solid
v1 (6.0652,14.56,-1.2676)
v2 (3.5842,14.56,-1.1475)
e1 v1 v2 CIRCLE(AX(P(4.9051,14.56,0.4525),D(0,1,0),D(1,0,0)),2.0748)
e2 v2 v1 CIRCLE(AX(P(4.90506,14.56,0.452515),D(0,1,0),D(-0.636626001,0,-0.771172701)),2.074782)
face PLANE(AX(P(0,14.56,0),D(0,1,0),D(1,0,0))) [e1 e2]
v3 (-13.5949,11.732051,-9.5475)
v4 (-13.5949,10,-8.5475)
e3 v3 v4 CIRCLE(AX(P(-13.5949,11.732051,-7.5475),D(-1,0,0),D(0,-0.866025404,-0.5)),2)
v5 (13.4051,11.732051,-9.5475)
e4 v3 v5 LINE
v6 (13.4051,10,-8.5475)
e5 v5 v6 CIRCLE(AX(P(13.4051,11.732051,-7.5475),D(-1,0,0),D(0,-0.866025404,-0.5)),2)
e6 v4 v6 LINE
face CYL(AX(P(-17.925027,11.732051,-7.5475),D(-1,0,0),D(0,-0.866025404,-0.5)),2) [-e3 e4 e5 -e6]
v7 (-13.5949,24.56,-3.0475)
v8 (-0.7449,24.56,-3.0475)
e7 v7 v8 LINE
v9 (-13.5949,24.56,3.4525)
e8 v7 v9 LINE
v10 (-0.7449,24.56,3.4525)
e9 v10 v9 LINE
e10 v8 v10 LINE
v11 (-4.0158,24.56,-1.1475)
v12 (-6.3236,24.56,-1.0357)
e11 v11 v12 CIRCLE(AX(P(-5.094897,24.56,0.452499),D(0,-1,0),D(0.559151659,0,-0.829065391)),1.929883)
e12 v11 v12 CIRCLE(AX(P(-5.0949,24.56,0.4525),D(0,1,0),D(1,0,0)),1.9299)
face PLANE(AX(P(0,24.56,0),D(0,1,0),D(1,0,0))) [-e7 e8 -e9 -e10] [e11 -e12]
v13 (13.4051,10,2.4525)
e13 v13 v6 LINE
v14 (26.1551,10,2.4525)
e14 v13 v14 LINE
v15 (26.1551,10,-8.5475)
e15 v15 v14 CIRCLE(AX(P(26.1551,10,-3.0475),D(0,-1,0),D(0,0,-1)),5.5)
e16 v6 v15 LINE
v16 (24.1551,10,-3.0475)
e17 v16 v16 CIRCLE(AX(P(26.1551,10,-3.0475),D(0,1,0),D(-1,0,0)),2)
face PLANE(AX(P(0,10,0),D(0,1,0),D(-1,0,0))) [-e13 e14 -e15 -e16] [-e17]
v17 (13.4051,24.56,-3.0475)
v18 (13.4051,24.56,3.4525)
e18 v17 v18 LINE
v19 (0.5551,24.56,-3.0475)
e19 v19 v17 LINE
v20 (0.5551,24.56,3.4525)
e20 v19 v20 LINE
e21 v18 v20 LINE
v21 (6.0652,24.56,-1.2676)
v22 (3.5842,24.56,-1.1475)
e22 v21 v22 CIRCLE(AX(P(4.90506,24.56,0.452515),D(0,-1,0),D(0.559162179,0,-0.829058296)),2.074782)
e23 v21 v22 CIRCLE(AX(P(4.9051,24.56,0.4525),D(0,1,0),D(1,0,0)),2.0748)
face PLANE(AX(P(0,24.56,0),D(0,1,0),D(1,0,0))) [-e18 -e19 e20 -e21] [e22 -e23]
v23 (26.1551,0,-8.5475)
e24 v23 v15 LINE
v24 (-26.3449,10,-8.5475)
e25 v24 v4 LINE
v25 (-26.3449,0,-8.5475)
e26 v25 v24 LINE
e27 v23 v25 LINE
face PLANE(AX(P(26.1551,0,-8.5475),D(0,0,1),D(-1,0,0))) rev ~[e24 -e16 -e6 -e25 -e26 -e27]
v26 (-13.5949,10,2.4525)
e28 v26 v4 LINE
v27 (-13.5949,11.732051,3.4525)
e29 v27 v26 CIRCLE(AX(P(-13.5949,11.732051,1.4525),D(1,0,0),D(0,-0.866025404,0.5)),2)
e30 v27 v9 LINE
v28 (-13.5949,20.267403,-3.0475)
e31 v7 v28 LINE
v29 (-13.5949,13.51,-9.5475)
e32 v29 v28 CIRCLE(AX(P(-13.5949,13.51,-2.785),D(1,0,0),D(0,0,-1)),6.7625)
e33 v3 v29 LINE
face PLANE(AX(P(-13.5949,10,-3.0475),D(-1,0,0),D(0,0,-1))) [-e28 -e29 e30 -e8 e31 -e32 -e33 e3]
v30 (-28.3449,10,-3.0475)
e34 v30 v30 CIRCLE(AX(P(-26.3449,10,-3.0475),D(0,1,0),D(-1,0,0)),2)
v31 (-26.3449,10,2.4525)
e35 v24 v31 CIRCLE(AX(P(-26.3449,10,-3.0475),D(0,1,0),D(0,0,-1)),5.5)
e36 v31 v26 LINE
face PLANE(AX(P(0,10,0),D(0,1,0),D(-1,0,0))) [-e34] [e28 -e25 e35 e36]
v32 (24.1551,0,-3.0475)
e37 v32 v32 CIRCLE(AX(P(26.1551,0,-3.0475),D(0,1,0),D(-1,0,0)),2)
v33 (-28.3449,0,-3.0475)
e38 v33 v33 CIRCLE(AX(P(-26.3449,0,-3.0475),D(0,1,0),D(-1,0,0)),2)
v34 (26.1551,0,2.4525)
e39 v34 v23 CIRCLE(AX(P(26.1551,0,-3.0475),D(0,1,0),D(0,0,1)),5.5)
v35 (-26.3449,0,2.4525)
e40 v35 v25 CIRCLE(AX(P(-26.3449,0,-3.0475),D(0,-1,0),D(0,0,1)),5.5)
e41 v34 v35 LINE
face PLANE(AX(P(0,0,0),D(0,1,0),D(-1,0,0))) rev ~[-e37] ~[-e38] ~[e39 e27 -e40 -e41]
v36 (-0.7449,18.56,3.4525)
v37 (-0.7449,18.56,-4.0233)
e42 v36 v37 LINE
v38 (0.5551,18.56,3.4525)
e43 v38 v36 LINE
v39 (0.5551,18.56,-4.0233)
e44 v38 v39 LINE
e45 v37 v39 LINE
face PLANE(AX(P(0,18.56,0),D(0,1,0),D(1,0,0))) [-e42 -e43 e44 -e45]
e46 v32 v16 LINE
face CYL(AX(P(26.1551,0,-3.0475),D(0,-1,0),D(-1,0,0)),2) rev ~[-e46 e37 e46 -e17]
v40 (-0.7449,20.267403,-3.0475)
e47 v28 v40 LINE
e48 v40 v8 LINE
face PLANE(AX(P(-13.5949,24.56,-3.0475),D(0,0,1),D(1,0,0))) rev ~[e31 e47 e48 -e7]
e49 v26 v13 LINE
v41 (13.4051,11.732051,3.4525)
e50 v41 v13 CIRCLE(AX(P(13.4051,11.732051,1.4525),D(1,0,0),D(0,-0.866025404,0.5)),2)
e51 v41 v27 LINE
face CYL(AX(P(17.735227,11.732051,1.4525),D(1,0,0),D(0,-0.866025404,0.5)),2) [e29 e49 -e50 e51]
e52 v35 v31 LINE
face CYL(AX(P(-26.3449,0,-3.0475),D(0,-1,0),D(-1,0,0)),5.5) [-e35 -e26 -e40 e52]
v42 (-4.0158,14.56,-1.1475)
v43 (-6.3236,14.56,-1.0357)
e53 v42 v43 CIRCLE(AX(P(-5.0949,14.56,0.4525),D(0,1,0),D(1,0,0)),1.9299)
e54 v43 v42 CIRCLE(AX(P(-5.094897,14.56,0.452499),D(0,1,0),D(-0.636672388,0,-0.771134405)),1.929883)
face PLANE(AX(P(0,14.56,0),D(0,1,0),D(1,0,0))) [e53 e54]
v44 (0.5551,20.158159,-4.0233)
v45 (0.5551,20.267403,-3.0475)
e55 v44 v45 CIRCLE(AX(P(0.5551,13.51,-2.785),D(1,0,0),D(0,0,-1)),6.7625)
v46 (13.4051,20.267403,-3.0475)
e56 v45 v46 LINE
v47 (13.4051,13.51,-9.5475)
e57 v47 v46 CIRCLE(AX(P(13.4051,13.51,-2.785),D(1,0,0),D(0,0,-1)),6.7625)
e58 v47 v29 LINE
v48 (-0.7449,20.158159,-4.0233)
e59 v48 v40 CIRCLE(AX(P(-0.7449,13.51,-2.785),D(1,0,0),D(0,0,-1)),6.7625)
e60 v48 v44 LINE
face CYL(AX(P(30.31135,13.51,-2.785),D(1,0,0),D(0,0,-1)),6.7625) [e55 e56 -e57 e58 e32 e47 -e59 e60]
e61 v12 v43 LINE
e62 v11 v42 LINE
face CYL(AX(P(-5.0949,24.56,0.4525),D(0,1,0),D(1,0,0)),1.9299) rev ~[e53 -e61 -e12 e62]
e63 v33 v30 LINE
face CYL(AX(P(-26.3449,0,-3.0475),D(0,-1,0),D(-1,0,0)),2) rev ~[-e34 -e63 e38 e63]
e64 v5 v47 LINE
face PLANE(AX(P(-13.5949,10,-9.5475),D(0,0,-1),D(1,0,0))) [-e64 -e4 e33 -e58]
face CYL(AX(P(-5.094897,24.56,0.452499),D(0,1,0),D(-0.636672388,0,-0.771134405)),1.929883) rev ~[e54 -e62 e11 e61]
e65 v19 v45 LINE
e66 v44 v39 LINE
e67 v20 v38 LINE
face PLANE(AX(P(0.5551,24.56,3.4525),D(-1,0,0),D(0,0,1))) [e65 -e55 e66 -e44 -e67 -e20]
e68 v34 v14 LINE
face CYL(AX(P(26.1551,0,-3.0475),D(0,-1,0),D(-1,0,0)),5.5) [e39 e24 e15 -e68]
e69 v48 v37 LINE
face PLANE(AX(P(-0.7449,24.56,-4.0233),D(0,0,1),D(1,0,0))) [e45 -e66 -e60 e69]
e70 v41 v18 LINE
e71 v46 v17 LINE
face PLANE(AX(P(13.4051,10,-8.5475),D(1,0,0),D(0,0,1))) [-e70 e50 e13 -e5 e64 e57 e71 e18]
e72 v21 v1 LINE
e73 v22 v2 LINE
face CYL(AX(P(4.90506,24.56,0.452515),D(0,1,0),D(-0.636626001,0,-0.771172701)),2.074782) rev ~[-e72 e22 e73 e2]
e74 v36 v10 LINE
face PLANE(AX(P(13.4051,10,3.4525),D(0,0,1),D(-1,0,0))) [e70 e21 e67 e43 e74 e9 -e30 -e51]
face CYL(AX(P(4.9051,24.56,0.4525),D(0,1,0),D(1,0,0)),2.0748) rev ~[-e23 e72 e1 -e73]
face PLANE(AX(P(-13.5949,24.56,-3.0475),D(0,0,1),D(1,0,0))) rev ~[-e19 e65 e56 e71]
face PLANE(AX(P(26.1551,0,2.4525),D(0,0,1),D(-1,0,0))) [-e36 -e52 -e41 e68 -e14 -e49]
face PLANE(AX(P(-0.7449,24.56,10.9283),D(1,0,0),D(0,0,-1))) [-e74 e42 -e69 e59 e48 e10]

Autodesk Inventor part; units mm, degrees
ref_plane "YZ Plane" through (0, 0, 0) normal (1, 0, 0) x (0, 1, 0)
ref_plane "XZ Plane" through (0, 0, 0) normal (0, 1, 0) x (-1, 0, 0)
ref_plane "XY Plane" through (0, 0, 0) normal (0, 0, 1) x (1, 0, 0)
sketch "Sketch1" plane through (0, 0, 0) normal (0, 1, 0) x (-1, 0, 0)
  circle A0 centre (-26.1551, -3.0475) radius 2
  arc A1 (-34.9051, -0.0475) -> (-17.4051, -0.0475) centre (-26.1551, -0.0475) ccw
  arc A2 (17.5949, -0.0475) -> (35.0949, -0.0475) centre (26.3449, -0.0475) ccw
  circle A3 centre (26.3449, -3.0475) radius 2
  circle A4 centre (-26.1551, -3.0475) radius 2
  circle A5 centre (26.3449, -3.0475) radius 2
  circle A6 centre (26.3449, -0.0475) radius 8.75
  circle A7 centre (-26.1551, -0.0475) radius 8.75
  line L0 (-34.9051, -0.0475) -> (-17.4051, -0.0475)
  line L1 (17.5949, -0.0475) -> (35.0949, -0.0475)
  circle A8 centre (-26.1551, -3.0475) radius 5.5
  circle A9 centre (26.3449, -3.0475) radius 5.5
  line L2 (-26.1551, -8.5475) -> (26.3449, -8.5475)
  line L3 (-26.1551, 2.4525) -> (26.3449, 2.4525)
  point P0 (0, 0)
  dimension "d0" = 11
  dimension "d1" = 11
extrude "Extrusion1" add sketch "Sketch1" along normal blind 10 contours L2 A8 L0 A1 | A1 A7 L3 A6 A2 L2 | A7 L0 A8 L3 | A8 L0 | L0 A8 | A2 L1 A9 L2 | L3 A9 L1 A6 | A9 L1 | A9 L1 picked at (-18.6939, -1.0014) picked at (-20.5799, 1.133) picked at (18.8536, -1.0809) picked at (20.7697, 1.133)
sketch "Sketch2" plane through (0, 10, 0) normal (0, 1, 0) x (1, 0, 0)
  line L0 (26.1551, 8.5475) -> (-26.3449, 8.5475) projected
  line L1 (-26.3449, -2.4525) -> (26.1551, -2.4525) projected
  arc A0 (-26.3449, 8.5475) -> (-26.3449, -2.4525) centre (-26.3449, 3.0475) ccw projected
  arc A1 (26.1551, -2.4525) -> (26.1551, 8.5475) centre (26.1551, 3.0475) ccw projected
  line L2 (-31.8449, 3.0475) -> (31.6551, 3.0475)
  line L3 (13.4051, -3.4525) -> (-13.5949, -3.4525)
  line L4 (-13.5949, -3.4525) -> (-13.5949, 9.5475)
  line L5 (-13.5949, 9.5475) -> (13.4051, 9.5475)
  line L6 (13.4051, 9.5475) -> (13.4051, -3.4525)
  line L7 (13.4051, -3.4525) -> (-13.5949, 9.5475) construction
  line L8 (-13.5949, -3.4525) -> (13.4051, 9.5475) construction
  point P0 (0, 0)
  point P1 (-0.0949, 3.0475)
  dimension "d4" = 27
  dimension "d5" = 13
extrude "Extrusion2" add sketch "Sketch2" along normal blind 14.56 contours L6 L2 L4 L0 | L0 L4 L5 L6 | L6 L1 L4 L2 | L6 L3 L4 L1
fillet "Fillet1" radius 2 2 edges at (-0.0949, 10, 3.4525) (-0.0949, 10, -9.5475)
sketch "Sketch3" plane through (0, 24.56, 0) normal (0, 1, 0) x (1, 0, 0)
  arc A0 (-6.3236, 1.0357) -> (-4.0158, 1.1475) centre (-5.0949, -0.4525) ccw
  arc A1 (3.5842, 1.1475) -> (6.0652, 1.2676) centre (4.9051, -0.4525) ccw
  circle A2 centre (4.9051, -0.4525) radius 2.0748
  circle A3 centre (-5.0949, -0.4525) radius 1.9299
  line L0 (-13.5949, 9.5475) -> (-13.5949, -3.4525) projected
  line L1 (13.4051, 9.5475) -> (-13.5949, 9.5475) projected
  line L2 (-13.5949, -3.4525) -> (13.4051, -3.4525) projected
  line L3 (13.4051, -3.4525) -> (13.4051, 9.5475) projected
  point P0 (0, 0)
  point P1 (6.0652, 1.2676)
  point P2 (-4.0158, 1.1475)
  dimension "d12" = 8.5
  dimension "d13" = 8.5
extrude "Extrusion3" cut sketch "Sketch3" against normal blind 10 contours A3 A0 | A2 A1
sketch "Sketch4" plane through (0, 24.56, 0) normal (0, 1, 0) x (1, 0, 0)
  line L0 (13.4051, 9.5475) -> (-13.5949, 9.5475) projected
  line L1 (-13.5949, -2.4525) -> (-13.5949, 8.5475) projected
  line L2 (13.4051, 9.5475) -> (-13.5949, 9.5475)
  line L3 (-13.5949, 9.5475) -> (-13.5949, 3.0475)
  line L4 (-13.5949, 3.0475) -> (13.4051, 3.0475)
  line L5 (13.4051, 3.0475) -> (13.4051, 9.5475)
  point P0 (0, 0)
extrude "Extrusion4" cut sketch "Sketch4" against normal blind 4.2875
fillet "Fillet2" radius 6.7625 1 edges at (-0.0949, 20.2725, -9.5475)
sketch "Sketch5" plane through (0, 24.56, 0) normal (0, 1, 0) x (1, 0, 0)
  line L0 (-13.5949, 3.0475) -> (-13.5949, 9.5475) projected
  line L1 (13.4051, -3.4525) -> (-13.5949, -3.4525) projected
  line L2 (-13.5949, 3.0475) -> (13.4051, 3.0475)
  line L3 (13.4051, 3.0475) -> (13.4051, -3.4525)
  line L4 (13.4051, -3.4525) -> (-13.5949, -3.4525)
  line L5 (-13.5949, -3.4525) -> (-13.5949, 3.0475)
  line L6 (0.5551, -10.9283) -> (-0.7449, -10.9283)
  line L7 (-0.7449, -10.9283) -> (-0.7449, 4.0233)
  line L8 (-0.7449, 4.0233) -> (0.5551, 4.0233)
  line L9 (0.5551, 4.0233) -> (0.5551, -10.9283)
  line L10 (0.5551, -10.9283) -> (-0.7449, 4.0233) construction
  line L11 (-0.7449, -10.9283) -> (0.5551, 4.0233) construction
  point P0 (0, 0)
  point P1 (-0.0949, -3.4525)
  dimension "d19" = 1.3
extrude "Extrusion5" cut sketch "Sketch5" against normal blind 6 contours L9 L6 L7 L1 | L1 L7 L2 L9 | L2 L7 L8 L9
properties part number "Servo Holder short side"
